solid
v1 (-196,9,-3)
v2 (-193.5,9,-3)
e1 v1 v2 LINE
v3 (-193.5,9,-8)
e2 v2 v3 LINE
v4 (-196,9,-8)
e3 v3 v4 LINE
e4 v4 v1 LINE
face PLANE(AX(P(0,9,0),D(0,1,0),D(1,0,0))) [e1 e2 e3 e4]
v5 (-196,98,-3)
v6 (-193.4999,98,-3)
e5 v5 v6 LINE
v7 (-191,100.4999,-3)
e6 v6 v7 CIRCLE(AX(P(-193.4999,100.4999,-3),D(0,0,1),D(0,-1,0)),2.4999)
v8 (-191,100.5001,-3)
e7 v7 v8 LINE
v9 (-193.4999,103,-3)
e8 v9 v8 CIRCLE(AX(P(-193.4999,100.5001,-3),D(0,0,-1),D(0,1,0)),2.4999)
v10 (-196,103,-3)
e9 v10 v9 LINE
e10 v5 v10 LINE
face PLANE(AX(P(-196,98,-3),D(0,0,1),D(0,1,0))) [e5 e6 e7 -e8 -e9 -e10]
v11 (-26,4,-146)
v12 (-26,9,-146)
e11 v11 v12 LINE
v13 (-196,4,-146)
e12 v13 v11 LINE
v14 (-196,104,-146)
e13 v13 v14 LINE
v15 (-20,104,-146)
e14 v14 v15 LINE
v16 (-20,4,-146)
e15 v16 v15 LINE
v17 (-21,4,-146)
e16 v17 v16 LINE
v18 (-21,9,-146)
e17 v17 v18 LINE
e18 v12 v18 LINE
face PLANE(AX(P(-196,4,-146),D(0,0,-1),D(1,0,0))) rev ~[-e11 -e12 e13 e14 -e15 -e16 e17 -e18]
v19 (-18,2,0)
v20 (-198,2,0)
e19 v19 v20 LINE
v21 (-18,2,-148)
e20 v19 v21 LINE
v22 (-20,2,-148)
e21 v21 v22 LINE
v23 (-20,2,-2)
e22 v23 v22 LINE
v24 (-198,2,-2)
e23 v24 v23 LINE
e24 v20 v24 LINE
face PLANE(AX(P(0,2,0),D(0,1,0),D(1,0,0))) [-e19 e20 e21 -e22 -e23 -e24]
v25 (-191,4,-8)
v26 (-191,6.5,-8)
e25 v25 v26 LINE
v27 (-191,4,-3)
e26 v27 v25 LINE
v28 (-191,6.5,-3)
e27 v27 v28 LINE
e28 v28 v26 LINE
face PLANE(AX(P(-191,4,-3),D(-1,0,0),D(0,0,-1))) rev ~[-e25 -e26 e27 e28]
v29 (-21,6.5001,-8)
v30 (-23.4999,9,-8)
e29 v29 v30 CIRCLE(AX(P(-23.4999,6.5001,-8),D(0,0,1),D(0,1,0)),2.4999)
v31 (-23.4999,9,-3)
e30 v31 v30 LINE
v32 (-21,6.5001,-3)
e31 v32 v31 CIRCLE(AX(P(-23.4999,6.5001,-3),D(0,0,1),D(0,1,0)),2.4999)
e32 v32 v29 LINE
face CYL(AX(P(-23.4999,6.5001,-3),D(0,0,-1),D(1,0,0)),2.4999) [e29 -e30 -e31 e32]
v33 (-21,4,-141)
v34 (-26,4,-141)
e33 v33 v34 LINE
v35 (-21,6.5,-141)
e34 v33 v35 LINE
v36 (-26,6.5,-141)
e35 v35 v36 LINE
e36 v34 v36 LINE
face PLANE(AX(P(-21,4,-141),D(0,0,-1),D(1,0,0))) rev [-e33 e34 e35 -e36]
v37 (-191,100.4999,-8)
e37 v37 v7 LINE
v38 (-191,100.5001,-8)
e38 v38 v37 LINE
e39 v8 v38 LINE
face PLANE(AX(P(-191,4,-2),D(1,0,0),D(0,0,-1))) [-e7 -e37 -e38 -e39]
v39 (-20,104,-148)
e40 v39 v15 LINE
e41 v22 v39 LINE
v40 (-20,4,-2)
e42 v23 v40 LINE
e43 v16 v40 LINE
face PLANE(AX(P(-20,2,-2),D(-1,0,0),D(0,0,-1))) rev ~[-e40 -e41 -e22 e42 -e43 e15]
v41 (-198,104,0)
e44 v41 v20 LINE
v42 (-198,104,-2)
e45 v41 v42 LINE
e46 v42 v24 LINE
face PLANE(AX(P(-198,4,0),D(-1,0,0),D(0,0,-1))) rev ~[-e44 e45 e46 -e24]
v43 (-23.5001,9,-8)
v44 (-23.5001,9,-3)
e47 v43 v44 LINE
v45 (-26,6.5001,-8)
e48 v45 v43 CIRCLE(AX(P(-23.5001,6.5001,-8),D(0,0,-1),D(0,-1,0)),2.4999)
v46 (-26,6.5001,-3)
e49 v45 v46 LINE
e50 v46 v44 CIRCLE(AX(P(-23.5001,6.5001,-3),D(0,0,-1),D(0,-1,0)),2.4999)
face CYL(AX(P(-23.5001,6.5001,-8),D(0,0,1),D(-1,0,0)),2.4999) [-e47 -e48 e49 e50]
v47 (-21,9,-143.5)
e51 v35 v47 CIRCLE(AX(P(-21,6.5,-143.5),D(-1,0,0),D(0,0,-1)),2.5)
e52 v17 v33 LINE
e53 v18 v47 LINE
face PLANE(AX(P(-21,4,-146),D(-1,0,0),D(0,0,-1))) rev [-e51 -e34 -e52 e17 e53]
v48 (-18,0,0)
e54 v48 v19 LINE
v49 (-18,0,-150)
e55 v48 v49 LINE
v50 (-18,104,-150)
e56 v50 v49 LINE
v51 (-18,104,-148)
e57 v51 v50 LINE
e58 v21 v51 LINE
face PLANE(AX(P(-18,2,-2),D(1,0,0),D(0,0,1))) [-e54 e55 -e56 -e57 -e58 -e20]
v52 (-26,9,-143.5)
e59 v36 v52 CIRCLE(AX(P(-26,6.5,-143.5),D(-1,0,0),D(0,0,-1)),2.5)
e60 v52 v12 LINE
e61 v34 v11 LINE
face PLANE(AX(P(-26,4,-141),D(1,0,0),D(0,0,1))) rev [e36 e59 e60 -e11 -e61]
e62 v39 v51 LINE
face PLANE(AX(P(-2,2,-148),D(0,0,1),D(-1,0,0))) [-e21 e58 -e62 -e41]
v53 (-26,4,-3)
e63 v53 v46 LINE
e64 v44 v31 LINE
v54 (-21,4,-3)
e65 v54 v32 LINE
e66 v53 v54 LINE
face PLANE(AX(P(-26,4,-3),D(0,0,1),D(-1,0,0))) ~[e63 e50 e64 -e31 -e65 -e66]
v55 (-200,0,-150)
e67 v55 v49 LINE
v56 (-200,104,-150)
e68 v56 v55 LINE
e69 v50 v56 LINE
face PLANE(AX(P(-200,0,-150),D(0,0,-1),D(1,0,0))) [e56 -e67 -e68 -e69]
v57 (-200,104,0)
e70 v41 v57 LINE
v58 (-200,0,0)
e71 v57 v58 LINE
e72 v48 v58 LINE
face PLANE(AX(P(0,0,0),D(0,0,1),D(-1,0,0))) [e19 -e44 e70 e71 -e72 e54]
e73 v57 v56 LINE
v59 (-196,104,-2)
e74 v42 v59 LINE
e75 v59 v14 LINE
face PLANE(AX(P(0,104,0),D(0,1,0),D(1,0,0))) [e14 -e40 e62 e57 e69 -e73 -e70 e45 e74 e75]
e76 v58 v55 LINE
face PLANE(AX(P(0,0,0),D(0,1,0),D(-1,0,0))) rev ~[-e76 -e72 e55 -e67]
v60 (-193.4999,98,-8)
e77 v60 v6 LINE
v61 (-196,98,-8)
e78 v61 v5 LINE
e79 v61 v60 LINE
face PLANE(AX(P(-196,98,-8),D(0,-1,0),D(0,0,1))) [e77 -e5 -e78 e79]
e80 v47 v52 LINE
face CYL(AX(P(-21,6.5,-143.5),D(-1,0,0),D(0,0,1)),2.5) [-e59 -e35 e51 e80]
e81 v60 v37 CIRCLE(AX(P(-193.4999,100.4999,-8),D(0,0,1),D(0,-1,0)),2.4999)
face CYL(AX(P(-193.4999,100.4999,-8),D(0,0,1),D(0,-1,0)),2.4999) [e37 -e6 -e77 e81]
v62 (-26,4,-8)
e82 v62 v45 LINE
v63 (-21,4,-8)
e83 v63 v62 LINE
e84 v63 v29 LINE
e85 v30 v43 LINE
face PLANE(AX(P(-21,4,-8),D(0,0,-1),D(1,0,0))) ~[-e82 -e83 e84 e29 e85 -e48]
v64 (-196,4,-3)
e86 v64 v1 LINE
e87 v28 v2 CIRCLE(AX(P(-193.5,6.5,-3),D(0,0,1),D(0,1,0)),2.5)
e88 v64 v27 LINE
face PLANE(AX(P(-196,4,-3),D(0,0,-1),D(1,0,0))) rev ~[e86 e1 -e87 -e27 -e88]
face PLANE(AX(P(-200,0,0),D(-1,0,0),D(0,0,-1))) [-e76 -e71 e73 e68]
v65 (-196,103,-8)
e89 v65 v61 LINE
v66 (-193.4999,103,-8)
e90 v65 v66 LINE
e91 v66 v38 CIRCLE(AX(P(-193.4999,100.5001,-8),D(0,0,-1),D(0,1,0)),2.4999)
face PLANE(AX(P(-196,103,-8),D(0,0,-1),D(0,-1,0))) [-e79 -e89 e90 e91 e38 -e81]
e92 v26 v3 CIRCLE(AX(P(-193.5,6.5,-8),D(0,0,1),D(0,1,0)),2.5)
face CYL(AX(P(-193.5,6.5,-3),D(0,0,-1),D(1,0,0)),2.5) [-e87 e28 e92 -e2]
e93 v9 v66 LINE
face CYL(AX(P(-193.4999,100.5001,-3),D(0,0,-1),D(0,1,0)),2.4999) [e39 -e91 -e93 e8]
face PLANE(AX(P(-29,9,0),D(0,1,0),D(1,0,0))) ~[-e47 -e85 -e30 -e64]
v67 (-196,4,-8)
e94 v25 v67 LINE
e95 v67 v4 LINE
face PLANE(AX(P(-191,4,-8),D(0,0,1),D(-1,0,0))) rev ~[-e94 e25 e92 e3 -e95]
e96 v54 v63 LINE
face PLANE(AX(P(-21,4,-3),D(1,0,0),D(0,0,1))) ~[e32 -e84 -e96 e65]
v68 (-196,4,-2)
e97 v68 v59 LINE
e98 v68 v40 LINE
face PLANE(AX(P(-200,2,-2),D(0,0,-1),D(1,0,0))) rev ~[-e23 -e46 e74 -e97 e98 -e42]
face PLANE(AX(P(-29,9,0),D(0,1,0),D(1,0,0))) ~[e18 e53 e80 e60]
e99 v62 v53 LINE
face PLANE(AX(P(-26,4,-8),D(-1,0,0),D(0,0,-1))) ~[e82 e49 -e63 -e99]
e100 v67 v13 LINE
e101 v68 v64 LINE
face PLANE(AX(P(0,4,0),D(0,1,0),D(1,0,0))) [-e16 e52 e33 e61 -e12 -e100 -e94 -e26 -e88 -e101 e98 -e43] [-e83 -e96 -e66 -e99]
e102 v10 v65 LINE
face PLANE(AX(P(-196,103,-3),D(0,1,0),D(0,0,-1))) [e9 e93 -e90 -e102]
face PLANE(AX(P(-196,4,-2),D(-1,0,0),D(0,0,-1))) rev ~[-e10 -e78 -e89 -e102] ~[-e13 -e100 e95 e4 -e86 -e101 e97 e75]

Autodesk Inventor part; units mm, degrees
ref_plane "YZ Plane" through (0, 0, 0) normal (1, 0, 0) x (0, 1, 0)
ref_plane "XZ Plane" through (0, 0, 0) normal (0, 1, 0) x (-1, 0, 0)
sketch "Sketch1" plane through (0, 0, 0) normal (0, 1, 0) x (-1, 0, 0)
  line L0 (0, 0) -> (200, 0)
  line L1 (200, 0) -> (200, -150)
  line L2 (200, -150) -> (0, -150)
  line L3 (0, -150) -> (0, 0)
  dimension "d0" = 200
  dimension "d1" = 150
extrude "Extrusion1" add sketch "Sketch1" along normal blind 2
sketch "Sketch2" plane through (0, 2, 0) normal (0, 1, 0) x (1, 0, 0)
  line L0 (-200, 0) -> (0, 0) projected
  line L1 (-200, 0) -> (-200, 2)
  line L2 (-200, 150) -> (-200, 0) projected
  line L3 (-200, 2) -> (-2, 2)
  line L4 (-2, 2) -> (-2, 150)
  line L5 (0, 150) -> (-200, 150) projected
  line L6 (-200, 2) -> (-200, 150)
  line L7 (-200, 150) -> (-2, 150)
  dimension "d4" = 2
  dimension "d5" = 198
extrude "Extrusion2" add sketch "Sketch2" along normal blind 2
sketch "Sketch3" plane through (0, 4, 0) normal (0, 1, 0) x (1, 0, 0)
  line L0 (0, 0) -> (0, 150) projected
  line L1 (0, 0) -> (-198, 0)
  line L2 (-198, 0) -> (-198, 148)
  line L3 (-198, 148) -> (0, 148)
  line L4 (0, 148) -> (0, 0)
  line L5 (0, 150) -> (-200, 150) projected
  line L6 (-200, 150) -> (0, 150)
  line L7 (0, 150) -> (0, 0)
  line L8 (0, 0) -> (-200, 0)
  line L9 (-200, 0) -> (-200, 150)
  dimension "d8" = 198
  dimension "d9" = 148
extrude "Extrusion3" add sketch "Sketch3" along normal blind 100 and the other way blind 2 contours L3 L2 L8 L9 L5 L0
sketch "Sketch4" plane through (0, 4, 0) normal (0, 1, 0) x (1, 0, 0)
  line L0 (-198, 2) -> (-2, 2) projected
  line L1 (-198, 2) -> (-196, 2)
  line L2 (-196, 2) -> (-196, 146)
  line L3 (-2, 148) -> (-198, 148) projected
  line L4 (-196, 146) -> (-2, 146)
  line L5 (-2, 2) -> (-2, 148) projected
  line L6 (-2, 2) -> (-198, 2)
  line L7 (-198, 2) -> (-198, 148)
  line L8 (-198, 148) -> (-2, 148)
  line L9 (-2, 148) -> (-2, 2)
  point P0 (0, 0)
  dimension "d14" = 2
  dimension "d15" = 144
extrude "Extrusion4" add sketch "Sketch4" along normal blind 100 contours L7 L3 L5 L4 L2 L0
sketch "Sketch7" plane through (0, 4, 0) normal (0, 1, 0) x (1, 0, 0)
  line L0 (-196, 2) -> (-2, 2) projected
  line L1 (-196, 2) -> (-196, 3)
  line L2 (-196, 146) -> (-196, 2) projected
  line L3 (-196, 3) -> (-191, 3)
  line L4 (-191, 3) -> (-191, 8)
  line L5 (-191, 8) -> (-196, 8)
  point P0 (0, 0)
  point P1 (-196, 117.9293)
  dimension "d36" = 1
  dimension "d37" = 5
  dimension "d38" = 5
extrude "Extrusion7" add sketch "Sketch7" along normal blind 5
fillet "Fillet2" radius 2.5 1 edges at (-191, 9, -5.5)
sketch "Sketch9" plane through (0, 4, 0) normal (0, 1, 0) x (1, 0, 0)
  line L0 (-196, 2) -> (-2, 2) projected
  line L1 (-2, 2) -> (-2, 3)
  line L2 (-2, 2) -> (-2, 146) projected
  line L3 (-2, 3) -> (-3, 3)
  line L4 (-3, 3) -> (-8, 3)
  line L5 (-8, 3) -> (-8, 8)
  line L6 (-8, 8) -> (-3, 8)
  line L7 (-3, 8) -> (-3, 3)
  point P0 (0, 0)
  dimension "d45" = 1
  dimension "d46" = 1
  dimension "d47" = 5
  dimension "d48" = 5
extrude "Extrusion9" add sketch "Sketch9" along normal blind 5
fillet "Fillet3" radius 2.5 2 edges at (-8, 9, -5.5) (-3, 9, -5.5)
sketch "Sketch10" plane through (-8, 4, -3) normal (0, 0, 1) x (1, 0, 0)
  arc A0 (5, 2.5) -> (0, 2.5) centre (2.5, 2.5) ccw projected
  circle A1 centre (2.5, 2.5) radius 1
  point P0 (8, -4)
  dimension "d52" = 2
extrude "Extrusion10" cut sketch "Sketch10" against normal blind 5
sketch "Sketch11" plane through (0, 4, 0) normal (0, 1, 0) x (1, 0, 0)
  line L0 (-2, 146) -> (-196, 146) projected
  line L1 (-2, 146) -> (-3, 146)
  line L2 (-3, 146) -> (-8, 146)
  line L3 (-8, 146) -> (-8, 141)
  line L4 (-8, 141) -> (-3, 141)
  line L5 (-3, 141) -> (-3, 146)
  point P0 (0, 0)
  point P1 (-144.9293, 146)
  dimension "d55" = 1
  dimension "d56" = 5
  dimension "d57" = 5
extrude "Extrusion11" add sketch "Sketch11" along normal blind 5
fillet "Fillet4" radius 2.5 1 edges at (-5.5, 9, -141)
sketch "Sketch12" plane through (-3, 4, -141) normal (1, 0, 0) x (0, 0, -1)
  arc A0 (2.5, 5) -> (0, 2.5) centre (2.5, 2.5) ccw projected
  circle A1 centre (2.5, 2.5) radius 1
  point P0 (-141, -4)
  dimension "d61" = 2
extrude "Extrusion12" cut sketch "Sketch12" against normal blind 5
sketch "Sketch13" plane through (-196, 104, -146) normal (0, 0, 1) x (1, 0, 0)
  line L0 (0, 0) -> (194, 0) projected
  line L1 (194, 0) -> (193, 0)
  line L2 (193, 0) -> (193, -1)
  line L3 (193, -1) -> (188, -1)
  line L4 (188, -1) -> (188, -6)
  line L5 (188, -6) -> (193, -6)
  line L6 (193, -6) -> (193, -1)
  point P0 (196, -104)
  dimension "d64" = 1
  dimension "d65" = 1
  dimension "d66" = 5
  dimension "d67" = 5
extrude "Extrusion13" add sketch "Sketch13" along normal blind 5
fillet "Fillet5" radius 2.5 2 edges at (-5.5, 103, -141) (-5.5, 98, -141)
sketch "Sketch14" plane through (-3, 98, -146) normal (1, 0, 0) x (0, 0, -1)
  arc A0 (-2.5, 5) -> (-2.5, 0) centre (-2.5, 2.5) ccw projected
  circle A1 centre (-2.5, 2.5) radius 1
  point P0 (-146, -98)
  dimension "d71" = 2
extrude "Extrusion14" cut sketch "Sketch14" against normal blind 5
sketch "Sketch15" plane through (-196, 4, -2) normal (1, 0, 0) x (0, 0, -1)
  line L0 (0, 100) -> (0, -2) projected
  line L1 (0, 100) -> (1, 100)
  line L2 (148, 100) -> (-2, 100) projected
  line L3 (1, 100) -> (1, 99)
  line L4 (1, 99) -> (6, 99)
  line L5 (6, 99) -> (6, 94)
  line L6 (6, 94) -> (1, 94)
  line L7 (1, 94) -> (1, 99)
  point P0 (-2, -4)
  dimension "d74" = 1
  dimension "d75" = 1
  dimension "d76" = 5
  dimension "d77" = 5
extrude "Extrusion15" add sketch "Sketch15" along normal blind 5
fillet "Fillet6" radius 2.5 2 edges at (-191, 103, -5.5) (-191, 98, -5.5)
sketch "Sketch17" plane through (0, 4, 0) normal (0, 1, 0) x (1, 0, 0)
  point P0 (0, 0)
sketch "Sketch18" plane through (0, 4, 0) normal (0, 1, 0) x (1, 0, 0)
  line L0 (-196, 2) -> (-196, 146) projected
  line L1 (-196, 84.7457) -> (-26, 84.7457)
  line L2 (0, 0) -> (0, 150) projected
  line L3 (-26, 84.7457) -> (-26, 146)
  line L4 (-196, 146) -> (-2, 146) projected
  line L5 (-26, 84.7457) -> (-26, 2)
  line L6 (-196, 2) -> (-2, 2) projected
  line L7 (-26, 143.5) -> (-27, 143.5)
  line L8 (-27, 143.5) -> (-2, 143.5)
  line L9 (-2, 148) -> (-2, 2) projected
  line L10 (-14.5, 143.5) -> (-14.5, 2)
  line L11 (-14.5, 143.5) -> (-16.2266, 143.5)
  line L12 (-16.2266, 143.5) -> (-16.2266, 2)
  line L13 (-16.2266, 2) -> (-14.5, 2)
  line L14 (-14.5, 2) -> (-14.5, 143.5)
  line L15 (-16.2266, 143.5) -> (-14.5, 143.5)
  line L16 (-14.5, 143.5) -> (-14.5, 2)
  line L17 (-14.5, 2) -> (-16.2266, 2)
  line L18 (-16.2266, 2) -> (-16.2266, 143.5)
  dimension "d84" = 170
  dimension "d85" = 1
sketch "Sketch19" plane through (0, 4, 0) normal (0, 1, 0) x (1, 0, 0)
  point P0 (0, 0)
extrude "Extrusion17" add sketch "Sketch18" along normal blind 10 contours L12 L8 L10 L6
ref_plane "Work Plane1" through (-14.5, 14, -2) normal (-1, 0, 0) x (0, 0, -1)
mirror "Mirror1" about plane through (-14.5, 4, -2) normal (1, 0, 0) of "Fillet3", "Extrusion9", "Extrusion11", "Fillet4"
sketch "Sketch20" plane through (0, 2, 0) normal (0, 1, 0) x (1, 0, 0)
  line L0 (-26, 143.5) -> (-21, 143.5) projected
  line L1 (-21, 143.5) -> (-20, 143.5)
  line L2 (-8, 146) -> (-21, 146) projected
  line L3 (-2, 148) -> (-2, 2) projected
  line L4 (-20, 146) -> (-2, 146)
  line L5 (-2, 146) -> (-2, 2)
  line L6 (-2, 2) -> (-20, 2)
  line L7 (-20, 2) -> (-20, 146)
  line L8 (0, 148) -> (-2, 148) projected
  line L9 (-20, 2) -> (-2, 2)
  line L10 (-2, 2) -> (-2, 148)
  line L11 (-2, 148) -> (-20, 148)
  line L12 (-20, 148) -> (-20, 2)
  point P0 (0, 0)
  dimension "d88" = 1
extrude "Extrusion18" cut sketch "Sketch20" along normal blind 1000
sketch "Sketch21" plane through (0, 2, 0) normal (0, 1, 0) x (1, 0, 0)
  line L0 (-20, 148) -> (-20, 2) projected
  line L1 (-20, 2) -> (-18, 2)
  line L2 (-198, 0) -> (0, 0) projected
  line L3 (0, 150) -> (-200, 150) projected
  line L4 (-18, 0) -> (0, 0)
  line L5 (0, 0) -> (0, 150)
  line L6 (0, 150) -> (-18, 150)
  line L7 (-18, 150) -> (-18, 0)
  dimension "d91" = 2
extrude "Extrusion19" cut sketch "Sketch21" along normal mid plane 1000
sketch "Sketch23" plane through (0, 4, 0) normal (0, 1, 0) x (1, 0, 0)
  point P0 (0, 0)
properties part number "kevnat part1"
